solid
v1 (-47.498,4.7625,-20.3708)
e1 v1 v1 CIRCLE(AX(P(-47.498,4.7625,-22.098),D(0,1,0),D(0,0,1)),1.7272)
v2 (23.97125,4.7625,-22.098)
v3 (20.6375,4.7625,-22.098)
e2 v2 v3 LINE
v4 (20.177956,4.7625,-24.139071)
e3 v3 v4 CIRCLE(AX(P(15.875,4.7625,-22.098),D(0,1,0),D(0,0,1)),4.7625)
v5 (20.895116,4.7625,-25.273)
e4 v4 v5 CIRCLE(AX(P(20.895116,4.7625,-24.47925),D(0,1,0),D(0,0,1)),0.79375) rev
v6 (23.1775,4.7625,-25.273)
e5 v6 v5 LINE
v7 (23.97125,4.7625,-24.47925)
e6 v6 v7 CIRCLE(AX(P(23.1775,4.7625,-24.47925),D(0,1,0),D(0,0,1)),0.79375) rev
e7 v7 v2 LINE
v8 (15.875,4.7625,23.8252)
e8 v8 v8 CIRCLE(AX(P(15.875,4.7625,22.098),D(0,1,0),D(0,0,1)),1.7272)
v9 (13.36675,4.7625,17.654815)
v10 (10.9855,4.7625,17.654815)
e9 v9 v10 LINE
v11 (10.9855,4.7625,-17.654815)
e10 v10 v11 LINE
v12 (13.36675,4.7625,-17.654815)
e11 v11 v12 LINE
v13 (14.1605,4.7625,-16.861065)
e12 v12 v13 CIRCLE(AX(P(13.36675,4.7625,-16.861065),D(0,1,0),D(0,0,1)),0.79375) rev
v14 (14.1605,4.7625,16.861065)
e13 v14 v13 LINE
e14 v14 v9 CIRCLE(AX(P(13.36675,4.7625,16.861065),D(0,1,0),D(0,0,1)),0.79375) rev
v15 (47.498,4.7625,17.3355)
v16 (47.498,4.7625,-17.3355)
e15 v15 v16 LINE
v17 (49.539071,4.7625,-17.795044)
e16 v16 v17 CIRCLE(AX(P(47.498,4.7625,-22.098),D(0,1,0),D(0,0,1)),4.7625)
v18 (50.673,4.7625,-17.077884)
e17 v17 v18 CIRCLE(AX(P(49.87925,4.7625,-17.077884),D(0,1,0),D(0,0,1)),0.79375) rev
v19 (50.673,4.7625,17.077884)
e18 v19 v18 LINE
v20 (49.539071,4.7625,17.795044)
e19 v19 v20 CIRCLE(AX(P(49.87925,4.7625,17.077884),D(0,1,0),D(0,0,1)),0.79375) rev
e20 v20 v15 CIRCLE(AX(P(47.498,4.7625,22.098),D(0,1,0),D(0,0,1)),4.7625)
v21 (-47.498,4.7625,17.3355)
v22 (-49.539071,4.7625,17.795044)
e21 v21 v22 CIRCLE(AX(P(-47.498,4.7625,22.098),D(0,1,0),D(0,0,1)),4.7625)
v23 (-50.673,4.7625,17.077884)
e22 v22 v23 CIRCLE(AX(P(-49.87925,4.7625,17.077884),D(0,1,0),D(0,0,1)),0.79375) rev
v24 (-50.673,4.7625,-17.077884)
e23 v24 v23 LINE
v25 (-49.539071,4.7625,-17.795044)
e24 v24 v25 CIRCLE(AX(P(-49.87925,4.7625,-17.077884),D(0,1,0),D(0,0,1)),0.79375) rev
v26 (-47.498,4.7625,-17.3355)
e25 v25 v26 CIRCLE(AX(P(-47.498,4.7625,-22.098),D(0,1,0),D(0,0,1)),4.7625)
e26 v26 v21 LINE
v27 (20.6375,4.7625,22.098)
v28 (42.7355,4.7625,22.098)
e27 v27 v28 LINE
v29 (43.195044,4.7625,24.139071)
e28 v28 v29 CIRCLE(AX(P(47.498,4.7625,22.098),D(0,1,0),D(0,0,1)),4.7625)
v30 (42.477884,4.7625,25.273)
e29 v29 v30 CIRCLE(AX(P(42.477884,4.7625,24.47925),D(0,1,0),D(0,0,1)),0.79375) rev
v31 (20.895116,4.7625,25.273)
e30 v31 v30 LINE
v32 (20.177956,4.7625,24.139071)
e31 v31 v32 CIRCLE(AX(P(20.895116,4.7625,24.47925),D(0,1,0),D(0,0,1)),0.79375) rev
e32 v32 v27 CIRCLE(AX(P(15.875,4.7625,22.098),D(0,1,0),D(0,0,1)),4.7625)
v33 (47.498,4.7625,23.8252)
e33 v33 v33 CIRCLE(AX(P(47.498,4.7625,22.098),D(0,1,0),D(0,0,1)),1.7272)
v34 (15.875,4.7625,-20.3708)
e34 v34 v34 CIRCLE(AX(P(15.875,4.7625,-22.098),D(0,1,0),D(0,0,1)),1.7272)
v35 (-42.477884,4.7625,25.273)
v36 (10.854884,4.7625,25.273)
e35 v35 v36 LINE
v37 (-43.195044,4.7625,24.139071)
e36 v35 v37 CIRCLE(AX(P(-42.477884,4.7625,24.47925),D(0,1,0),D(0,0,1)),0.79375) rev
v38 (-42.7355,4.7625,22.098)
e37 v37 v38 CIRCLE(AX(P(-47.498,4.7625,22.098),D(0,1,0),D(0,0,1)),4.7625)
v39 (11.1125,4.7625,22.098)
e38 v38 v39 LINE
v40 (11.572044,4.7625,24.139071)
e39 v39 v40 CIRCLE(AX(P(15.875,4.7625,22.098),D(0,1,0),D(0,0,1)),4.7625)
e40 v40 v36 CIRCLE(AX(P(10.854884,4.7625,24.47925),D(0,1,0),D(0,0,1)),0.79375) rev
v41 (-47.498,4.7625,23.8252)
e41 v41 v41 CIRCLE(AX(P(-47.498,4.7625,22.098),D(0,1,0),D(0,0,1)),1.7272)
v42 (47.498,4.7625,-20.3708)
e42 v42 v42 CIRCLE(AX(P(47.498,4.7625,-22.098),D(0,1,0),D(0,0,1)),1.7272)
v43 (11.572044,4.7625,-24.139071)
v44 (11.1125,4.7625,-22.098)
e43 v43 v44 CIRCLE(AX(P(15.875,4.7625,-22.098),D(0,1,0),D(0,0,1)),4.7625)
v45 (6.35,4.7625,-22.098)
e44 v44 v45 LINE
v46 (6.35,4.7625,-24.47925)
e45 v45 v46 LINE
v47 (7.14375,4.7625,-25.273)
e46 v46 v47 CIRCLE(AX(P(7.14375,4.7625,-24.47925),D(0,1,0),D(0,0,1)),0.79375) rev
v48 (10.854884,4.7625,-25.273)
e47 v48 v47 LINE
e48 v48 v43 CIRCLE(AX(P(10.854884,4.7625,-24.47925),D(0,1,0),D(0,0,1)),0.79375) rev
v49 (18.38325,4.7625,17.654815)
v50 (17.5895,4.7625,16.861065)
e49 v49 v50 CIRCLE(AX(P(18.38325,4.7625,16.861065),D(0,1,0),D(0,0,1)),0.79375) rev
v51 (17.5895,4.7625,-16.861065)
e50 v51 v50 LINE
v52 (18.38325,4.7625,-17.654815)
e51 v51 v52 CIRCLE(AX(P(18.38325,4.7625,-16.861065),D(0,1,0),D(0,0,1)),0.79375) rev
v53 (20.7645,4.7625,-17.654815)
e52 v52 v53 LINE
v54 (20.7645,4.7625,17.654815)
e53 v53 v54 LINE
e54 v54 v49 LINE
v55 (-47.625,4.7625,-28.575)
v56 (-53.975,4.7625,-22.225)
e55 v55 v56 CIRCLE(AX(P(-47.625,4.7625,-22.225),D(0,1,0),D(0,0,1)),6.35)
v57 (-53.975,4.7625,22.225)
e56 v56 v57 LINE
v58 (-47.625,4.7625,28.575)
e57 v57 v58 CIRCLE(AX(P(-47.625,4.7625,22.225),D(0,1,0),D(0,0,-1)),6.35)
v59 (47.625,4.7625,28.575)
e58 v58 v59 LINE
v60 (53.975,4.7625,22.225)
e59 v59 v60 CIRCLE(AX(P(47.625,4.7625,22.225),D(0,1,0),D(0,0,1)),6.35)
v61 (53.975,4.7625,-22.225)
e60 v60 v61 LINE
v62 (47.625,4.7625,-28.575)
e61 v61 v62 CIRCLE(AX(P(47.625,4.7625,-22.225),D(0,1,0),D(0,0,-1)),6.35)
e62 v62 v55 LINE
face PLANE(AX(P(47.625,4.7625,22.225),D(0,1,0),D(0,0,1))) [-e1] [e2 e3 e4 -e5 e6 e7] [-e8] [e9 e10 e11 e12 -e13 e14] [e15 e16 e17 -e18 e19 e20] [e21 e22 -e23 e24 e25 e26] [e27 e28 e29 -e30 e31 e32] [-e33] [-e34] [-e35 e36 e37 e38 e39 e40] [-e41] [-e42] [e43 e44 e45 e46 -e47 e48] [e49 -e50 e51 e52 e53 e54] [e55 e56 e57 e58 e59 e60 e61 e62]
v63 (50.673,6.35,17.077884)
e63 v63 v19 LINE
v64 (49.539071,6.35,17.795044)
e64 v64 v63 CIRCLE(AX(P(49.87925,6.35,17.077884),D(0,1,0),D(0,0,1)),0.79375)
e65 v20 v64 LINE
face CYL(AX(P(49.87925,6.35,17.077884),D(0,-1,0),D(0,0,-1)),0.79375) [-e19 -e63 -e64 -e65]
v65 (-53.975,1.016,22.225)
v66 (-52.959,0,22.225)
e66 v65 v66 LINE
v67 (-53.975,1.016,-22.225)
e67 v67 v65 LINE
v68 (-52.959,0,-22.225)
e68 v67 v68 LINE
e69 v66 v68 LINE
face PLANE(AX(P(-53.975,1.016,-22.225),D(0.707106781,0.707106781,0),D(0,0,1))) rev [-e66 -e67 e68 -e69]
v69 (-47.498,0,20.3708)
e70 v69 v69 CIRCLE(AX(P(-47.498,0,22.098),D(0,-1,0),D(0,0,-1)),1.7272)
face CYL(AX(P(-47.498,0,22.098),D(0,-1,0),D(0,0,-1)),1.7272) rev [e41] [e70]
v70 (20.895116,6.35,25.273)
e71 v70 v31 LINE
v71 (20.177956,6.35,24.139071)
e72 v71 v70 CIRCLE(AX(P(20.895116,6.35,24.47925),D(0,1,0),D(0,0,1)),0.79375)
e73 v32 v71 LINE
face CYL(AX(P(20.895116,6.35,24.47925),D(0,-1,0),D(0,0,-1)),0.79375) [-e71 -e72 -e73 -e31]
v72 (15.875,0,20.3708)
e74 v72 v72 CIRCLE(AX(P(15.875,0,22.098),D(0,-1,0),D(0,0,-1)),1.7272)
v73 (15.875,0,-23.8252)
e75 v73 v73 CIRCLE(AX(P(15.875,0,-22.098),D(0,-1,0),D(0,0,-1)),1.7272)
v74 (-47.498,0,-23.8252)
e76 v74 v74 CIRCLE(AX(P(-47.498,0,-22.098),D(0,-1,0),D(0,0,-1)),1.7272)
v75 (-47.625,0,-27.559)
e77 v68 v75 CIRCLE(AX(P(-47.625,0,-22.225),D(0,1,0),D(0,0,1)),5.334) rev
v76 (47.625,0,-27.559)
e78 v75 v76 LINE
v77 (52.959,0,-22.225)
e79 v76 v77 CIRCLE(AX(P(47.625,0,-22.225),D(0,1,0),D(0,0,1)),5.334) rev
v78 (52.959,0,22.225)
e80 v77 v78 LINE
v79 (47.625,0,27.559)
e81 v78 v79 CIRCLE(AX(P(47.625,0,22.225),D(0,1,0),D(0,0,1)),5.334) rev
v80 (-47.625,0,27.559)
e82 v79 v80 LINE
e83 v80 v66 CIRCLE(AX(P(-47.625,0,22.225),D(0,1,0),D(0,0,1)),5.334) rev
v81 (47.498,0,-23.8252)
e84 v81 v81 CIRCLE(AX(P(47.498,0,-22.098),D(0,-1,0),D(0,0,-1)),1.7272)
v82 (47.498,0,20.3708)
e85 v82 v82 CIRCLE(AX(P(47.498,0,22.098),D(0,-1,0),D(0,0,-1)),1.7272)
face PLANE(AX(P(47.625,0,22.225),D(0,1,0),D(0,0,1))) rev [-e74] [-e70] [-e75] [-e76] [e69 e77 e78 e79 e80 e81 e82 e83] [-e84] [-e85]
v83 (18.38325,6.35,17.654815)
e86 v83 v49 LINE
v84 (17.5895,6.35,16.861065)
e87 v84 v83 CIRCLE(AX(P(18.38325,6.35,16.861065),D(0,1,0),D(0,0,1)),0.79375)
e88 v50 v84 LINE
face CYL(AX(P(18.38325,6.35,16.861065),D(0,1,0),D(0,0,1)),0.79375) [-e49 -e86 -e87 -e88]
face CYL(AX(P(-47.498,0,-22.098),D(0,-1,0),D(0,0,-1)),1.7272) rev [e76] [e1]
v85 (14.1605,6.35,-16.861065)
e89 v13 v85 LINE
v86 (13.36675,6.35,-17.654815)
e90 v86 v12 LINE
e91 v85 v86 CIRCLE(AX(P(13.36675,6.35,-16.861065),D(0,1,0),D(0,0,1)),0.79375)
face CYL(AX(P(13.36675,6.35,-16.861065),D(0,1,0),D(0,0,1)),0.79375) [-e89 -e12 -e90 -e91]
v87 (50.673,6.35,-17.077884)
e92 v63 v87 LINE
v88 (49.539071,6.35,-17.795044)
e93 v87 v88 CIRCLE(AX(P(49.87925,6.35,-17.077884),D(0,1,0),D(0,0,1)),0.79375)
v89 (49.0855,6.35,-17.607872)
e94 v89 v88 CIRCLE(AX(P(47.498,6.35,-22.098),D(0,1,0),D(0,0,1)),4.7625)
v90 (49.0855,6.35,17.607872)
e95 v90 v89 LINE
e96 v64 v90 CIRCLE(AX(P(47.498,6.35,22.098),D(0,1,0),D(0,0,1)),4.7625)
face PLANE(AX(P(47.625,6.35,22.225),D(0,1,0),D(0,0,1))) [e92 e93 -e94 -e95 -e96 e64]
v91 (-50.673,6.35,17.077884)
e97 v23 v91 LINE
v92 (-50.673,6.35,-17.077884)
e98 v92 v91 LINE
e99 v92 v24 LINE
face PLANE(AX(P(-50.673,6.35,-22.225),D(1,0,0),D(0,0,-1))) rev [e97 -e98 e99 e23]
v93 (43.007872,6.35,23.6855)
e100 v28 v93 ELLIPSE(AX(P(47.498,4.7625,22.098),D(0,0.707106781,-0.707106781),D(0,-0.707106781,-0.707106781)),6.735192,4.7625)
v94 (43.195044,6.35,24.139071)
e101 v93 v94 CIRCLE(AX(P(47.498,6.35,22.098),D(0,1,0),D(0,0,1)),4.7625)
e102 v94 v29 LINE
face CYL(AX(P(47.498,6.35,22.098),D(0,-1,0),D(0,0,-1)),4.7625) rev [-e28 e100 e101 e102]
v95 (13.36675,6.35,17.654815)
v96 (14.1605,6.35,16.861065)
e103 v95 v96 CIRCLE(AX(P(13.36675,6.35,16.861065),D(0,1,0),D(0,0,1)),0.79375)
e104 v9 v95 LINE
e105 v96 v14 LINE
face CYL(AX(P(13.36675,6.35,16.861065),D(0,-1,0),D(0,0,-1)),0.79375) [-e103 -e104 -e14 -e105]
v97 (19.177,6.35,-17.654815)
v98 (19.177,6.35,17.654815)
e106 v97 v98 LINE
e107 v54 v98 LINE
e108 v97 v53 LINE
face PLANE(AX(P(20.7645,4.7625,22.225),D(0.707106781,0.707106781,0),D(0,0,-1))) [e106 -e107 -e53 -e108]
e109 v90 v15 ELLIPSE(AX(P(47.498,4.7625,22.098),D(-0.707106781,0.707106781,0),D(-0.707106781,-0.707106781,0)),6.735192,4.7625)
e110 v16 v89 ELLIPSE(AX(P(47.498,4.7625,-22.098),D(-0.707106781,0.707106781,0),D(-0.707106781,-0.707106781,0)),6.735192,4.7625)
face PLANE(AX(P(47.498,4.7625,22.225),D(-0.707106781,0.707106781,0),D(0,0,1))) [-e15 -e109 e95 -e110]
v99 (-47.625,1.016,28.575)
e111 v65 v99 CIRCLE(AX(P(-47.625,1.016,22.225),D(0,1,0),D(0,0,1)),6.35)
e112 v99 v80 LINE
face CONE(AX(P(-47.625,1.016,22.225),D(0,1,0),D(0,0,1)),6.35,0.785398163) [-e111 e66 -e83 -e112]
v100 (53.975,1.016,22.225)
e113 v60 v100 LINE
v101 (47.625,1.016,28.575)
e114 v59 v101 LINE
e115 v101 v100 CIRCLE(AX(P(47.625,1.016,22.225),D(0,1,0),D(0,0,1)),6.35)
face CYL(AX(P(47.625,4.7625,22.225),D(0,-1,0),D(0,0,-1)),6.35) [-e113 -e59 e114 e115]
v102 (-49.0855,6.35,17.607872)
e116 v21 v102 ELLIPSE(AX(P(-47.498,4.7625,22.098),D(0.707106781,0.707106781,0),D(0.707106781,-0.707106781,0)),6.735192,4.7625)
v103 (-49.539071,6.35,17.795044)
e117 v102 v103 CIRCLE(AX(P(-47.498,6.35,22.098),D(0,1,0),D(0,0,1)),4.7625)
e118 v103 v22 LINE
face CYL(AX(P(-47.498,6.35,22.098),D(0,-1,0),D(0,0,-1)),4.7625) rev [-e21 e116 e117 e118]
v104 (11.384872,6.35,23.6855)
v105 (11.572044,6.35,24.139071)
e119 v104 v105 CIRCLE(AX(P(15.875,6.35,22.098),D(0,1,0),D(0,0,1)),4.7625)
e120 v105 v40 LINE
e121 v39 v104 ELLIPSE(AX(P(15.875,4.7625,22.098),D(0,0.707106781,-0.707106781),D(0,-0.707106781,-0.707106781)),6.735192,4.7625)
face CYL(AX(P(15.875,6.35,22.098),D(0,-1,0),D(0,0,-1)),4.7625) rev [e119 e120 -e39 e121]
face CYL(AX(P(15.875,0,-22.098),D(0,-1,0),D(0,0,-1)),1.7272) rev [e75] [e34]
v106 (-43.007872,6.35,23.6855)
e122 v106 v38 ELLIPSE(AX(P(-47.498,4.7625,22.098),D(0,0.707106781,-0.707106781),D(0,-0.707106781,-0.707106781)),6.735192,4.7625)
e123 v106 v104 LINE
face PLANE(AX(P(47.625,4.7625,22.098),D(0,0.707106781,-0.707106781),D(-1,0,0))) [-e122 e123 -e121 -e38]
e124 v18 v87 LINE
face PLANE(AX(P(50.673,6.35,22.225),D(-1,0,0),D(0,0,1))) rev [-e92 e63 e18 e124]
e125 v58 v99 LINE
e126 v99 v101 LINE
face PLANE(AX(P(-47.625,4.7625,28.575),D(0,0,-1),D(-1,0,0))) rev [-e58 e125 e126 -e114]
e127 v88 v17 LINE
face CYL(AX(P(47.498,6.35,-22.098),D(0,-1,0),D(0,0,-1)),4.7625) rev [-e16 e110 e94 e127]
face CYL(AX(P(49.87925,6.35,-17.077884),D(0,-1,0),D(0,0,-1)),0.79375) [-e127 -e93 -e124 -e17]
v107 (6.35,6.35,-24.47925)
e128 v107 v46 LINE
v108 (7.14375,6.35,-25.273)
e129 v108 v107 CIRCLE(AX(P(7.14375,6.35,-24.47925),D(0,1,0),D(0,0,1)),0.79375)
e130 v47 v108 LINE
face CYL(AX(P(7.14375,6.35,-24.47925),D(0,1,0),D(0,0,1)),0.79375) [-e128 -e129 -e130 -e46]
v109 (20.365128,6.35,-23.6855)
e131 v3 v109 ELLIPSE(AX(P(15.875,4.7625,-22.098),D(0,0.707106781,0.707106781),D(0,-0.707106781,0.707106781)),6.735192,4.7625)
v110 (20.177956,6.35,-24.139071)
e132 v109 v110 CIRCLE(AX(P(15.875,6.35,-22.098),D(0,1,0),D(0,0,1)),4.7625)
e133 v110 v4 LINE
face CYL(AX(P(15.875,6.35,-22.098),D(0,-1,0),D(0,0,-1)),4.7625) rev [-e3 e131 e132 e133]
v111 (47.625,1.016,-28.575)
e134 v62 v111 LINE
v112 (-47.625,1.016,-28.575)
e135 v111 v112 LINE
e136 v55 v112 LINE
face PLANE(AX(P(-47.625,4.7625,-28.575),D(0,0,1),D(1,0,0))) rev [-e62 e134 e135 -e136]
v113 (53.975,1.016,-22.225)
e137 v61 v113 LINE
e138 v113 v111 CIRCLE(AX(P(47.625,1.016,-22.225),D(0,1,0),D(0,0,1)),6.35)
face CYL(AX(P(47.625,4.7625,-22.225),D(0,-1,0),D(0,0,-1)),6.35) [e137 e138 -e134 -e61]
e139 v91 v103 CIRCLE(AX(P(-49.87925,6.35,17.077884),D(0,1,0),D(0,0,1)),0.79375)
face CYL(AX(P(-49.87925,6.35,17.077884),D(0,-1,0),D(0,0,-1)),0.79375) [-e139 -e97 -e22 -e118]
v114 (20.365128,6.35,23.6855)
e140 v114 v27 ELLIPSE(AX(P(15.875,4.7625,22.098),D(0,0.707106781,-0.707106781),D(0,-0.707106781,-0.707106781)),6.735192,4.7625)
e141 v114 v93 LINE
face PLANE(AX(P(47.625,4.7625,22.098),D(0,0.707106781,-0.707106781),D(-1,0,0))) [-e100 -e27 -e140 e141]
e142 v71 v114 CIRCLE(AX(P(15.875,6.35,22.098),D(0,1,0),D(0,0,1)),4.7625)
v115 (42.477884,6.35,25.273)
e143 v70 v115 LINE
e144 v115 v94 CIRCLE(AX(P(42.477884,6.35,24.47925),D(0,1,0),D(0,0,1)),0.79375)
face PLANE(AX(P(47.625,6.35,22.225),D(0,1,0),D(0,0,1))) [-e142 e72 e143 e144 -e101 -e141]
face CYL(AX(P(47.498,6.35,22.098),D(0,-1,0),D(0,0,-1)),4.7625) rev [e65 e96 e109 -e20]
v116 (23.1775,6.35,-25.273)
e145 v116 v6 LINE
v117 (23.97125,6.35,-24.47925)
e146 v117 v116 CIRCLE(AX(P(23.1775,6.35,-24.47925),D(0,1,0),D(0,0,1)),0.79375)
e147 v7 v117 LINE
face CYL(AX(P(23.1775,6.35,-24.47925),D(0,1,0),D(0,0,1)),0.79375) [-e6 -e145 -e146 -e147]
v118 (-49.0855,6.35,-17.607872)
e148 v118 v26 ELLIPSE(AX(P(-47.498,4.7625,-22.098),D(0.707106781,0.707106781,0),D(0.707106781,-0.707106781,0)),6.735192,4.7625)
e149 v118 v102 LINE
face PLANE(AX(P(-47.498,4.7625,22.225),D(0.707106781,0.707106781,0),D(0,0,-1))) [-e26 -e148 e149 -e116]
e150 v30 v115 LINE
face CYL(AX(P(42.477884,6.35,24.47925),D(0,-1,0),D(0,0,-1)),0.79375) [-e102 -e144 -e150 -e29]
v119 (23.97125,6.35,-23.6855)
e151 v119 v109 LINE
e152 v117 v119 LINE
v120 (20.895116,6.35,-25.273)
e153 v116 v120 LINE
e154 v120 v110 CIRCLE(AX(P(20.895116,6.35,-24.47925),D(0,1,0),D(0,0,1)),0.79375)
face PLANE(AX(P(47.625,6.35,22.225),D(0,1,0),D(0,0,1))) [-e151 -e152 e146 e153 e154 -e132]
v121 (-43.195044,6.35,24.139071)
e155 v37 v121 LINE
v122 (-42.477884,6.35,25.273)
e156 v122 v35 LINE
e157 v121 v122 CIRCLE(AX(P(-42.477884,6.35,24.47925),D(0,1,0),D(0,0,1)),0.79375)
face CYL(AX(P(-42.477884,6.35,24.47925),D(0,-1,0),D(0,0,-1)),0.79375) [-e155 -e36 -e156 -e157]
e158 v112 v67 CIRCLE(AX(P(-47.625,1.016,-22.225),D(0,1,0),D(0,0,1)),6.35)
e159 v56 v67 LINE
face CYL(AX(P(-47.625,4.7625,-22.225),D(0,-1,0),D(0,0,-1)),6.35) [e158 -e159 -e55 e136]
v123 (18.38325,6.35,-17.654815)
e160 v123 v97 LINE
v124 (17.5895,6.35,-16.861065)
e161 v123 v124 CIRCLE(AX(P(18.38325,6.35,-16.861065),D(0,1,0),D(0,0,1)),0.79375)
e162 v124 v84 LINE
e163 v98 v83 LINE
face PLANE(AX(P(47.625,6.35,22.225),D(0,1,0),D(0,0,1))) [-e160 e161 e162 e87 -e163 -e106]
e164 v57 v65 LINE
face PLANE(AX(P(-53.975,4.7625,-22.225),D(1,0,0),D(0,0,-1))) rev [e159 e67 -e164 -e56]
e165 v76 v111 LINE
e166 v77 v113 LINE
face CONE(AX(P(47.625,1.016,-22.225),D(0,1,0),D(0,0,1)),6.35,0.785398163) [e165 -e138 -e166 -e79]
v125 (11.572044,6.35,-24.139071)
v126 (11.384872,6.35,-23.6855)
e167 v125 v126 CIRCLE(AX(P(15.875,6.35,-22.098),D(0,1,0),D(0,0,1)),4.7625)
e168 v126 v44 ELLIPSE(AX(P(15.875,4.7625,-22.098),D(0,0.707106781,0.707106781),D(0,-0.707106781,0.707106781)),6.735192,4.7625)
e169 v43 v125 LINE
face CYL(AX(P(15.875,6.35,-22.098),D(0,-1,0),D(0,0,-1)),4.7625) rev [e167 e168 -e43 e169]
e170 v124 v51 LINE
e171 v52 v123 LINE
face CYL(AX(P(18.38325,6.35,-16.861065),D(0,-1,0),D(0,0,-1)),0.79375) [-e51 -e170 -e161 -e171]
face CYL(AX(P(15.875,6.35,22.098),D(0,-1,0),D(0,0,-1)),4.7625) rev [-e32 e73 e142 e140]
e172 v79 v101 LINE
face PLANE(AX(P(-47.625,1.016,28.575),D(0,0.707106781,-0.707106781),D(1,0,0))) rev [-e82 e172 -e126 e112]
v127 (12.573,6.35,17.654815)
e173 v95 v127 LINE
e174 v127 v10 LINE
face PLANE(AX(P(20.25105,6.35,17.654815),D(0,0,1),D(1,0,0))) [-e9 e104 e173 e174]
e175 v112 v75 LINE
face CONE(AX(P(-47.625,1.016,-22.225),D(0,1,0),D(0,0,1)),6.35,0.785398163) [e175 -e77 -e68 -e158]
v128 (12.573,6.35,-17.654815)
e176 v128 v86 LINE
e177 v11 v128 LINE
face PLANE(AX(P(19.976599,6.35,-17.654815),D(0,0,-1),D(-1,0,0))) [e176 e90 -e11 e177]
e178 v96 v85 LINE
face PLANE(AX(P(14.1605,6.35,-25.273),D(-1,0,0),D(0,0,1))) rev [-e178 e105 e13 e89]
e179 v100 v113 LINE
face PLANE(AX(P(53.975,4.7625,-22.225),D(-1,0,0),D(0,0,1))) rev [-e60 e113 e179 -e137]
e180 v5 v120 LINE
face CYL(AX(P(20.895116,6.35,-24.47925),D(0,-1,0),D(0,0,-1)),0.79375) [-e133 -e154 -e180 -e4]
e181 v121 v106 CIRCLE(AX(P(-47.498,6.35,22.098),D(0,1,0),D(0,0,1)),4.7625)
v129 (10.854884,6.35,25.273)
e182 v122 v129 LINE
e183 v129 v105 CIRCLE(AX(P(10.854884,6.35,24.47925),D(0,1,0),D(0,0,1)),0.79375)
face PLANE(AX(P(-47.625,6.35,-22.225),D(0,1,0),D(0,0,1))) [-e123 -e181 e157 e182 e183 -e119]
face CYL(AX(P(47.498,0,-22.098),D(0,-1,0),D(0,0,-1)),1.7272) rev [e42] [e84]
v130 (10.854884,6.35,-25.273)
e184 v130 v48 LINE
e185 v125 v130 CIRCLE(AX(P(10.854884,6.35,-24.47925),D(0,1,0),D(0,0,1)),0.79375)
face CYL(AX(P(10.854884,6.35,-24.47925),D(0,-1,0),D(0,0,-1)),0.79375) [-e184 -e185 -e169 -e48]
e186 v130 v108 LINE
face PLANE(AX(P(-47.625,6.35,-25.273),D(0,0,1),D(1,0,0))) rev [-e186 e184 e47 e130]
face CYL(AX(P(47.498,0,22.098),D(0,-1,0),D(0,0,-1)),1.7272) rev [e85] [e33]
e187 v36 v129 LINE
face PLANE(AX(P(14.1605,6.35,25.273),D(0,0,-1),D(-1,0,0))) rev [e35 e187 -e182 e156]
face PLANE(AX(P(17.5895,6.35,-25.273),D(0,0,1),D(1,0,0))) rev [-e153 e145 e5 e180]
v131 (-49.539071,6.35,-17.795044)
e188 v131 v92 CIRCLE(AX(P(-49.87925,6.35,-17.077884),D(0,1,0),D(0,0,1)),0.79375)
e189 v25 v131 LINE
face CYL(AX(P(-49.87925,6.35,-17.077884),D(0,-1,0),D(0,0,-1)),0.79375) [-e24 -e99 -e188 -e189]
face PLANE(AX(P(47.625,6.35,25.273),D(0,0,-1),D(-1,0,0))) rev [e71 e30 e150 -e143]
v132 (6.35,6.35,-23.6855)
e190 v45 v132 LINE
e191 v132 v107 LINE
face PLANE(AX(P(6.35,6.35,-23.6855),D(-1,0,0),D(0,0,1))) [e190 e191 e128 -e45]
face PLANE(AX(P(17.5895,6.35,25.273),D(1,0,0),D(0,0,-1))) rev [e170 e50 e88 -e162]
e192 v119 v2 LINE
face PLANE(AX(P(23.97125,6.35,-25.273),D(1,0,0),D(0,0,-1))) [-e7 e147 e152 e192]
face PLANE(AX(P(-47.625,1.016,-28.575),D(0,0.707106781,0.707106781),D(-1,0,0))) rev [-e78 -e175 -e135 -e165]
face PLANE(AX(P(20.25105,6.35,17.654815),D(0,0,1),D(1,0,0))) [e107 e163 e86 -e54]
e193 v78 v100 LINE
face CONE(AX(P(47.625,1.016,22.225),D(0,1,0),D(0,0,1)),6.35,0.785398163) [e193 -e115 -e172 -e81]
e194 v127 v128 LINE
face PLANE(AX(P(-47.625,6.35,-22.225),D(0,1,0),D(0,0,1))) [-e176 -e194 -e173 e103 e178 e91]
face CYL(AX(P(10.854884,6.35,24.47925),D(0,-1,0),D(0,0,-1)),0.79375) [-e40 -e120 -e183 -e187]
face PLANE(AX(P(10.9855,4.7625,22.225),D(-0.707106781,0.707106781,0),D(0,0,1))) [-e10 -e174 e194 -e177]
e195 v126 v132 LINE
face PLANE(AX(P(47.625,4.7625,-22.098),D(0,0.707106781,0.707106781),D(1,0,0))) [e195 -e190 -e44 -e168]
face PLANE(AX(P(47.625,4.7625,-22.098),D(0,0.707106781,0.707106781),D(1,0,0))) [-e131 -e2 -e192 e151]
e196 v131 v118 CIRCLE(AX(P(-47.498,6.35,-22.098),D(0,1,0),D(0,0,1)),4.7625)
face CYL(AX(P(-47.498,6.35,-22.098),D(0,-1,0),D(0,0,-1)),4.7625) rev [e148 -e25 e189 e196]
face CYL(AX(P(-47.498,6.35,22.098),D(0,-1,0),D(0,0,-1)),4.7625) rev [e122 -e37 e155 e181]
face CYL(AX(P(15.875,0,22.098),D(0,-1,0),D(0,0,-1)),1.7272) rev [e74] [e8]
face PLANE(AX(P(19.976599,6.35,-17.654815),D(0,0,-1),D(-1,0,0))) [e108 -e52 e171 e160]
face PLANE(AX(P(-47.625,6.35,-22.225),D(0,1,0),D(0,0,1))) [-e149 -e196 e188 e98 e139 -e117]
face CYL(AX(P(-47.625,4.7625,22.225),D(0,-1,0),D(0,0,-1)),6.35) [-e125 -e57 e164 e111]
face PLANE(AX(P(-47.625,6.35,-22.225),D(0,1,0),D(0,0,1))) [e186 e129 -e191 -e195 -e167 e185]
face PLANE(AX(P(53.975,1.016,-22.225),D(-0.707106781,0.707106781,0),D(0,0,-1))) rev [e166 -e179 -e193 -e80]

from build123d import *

# Parameters (mm, degrees)
BOSS_EXTRUDE1_DEPTH   = 4.7625
BOSS_EXTRUDE2_DEPTH   = 1.5875
SKETCH3_W             = 50.8
SKETCH3_H             = 1.5875
SKETCH3_W_2           = 20.32
CUT_EXTRUDE1_DEPTH    = 62.257755886
F_4_CLEARANCE_HOLE1_D = 3.4544
SKETCH6_R             = 4.7625
CUT_EXTRUDE2_DEPTH    = 62.257755886
SKETCH7_W             = 8.127020596
SKETCH7_H             = 2.415508094
SKETCH7_W_2           = 9.383301438
SKETCH7_H_2           = 3.436417543
CUT_EXTRUDE3_DEPTH    = 62.257755886
CHAMFER1_SIZE         = 1.5875
FILLET1_R             = 0.79375
CHAMFER2_SIZE         = 1.016


with BuildPart() as part:
    # Sketch1 → Boss-Extrude1 (new body)
    with BuildSketch(Plane(origin=(0, 0, 0), x_dir=(1, 0, 0), z_dir=(0, 1, 0))):
        with BuildLine():
            Line((-47.625, 28.575), (47.625, 28.575))
            ThreePointArc((47.625, 28.575), (52.115128061, 26.715128061), (53.975, 22.225))
            Line((53.975, 22.225), (53.975, -22.225))
            ThreePointArc((53.975, -22.225), (52.115128061, -26.715128061), (47.625, -28.575))
            Line((47.625, -28.575), (-47.625, -28.575))
            ThreePointArc((-47.625, -28.575), (-52.115128061, -26.715128061), (-53.975, -22.225))
            Line((-53.975, -22.225), (-53.975, 22.225))
            ThreePointArc((-53.975, 22.225), (-52.115128061, 26.715128061), (-47.625, 28.575))
        make_face()
    extrude(amount=BOSS_EXTRUDE1_DEPTH)

    # Sketch2 → Boss-Extrude2 (add)
    # profile 1 of 2: a face of its own
    with BuildSketch(Plane(origin=(0, 4.7625, 0), x_dir=(1, 0, 0), z_dir=(0, 1, 0))):
        with BuildLine():
            Line((-50.673, 22.225), (-50.673, -22.225))
            ThreePointArc((-50.673, -22.225), (-49.780261469, -24.380261469), (-47.625, -25.273))
            Line((-47.625, -25.273), (14.1605, -25.273))
            Line((14.1605, -25.273), (14.1605, 25.273))
            Line((14.1605, 25.273), (-47.625, 25.273))
            ThreePointArc((-47.625, 25.273), (-49.780261469, 24.380261469), (-50.673, 22.225))
        make_face()
        with BuildLine():
            Line((12.573, -23.6855), (-47.625, -23.6855))
            ThreePointArc((-47.625, -23.6855), (-48.657729454, -23.257729454), (-49.0855, -22.225))
            Line((-49.0855, -22.225), (-49.0855, 22.225))
            ThreePointArc((-49.0855, 22.225), (-48.657729454, 23.257729454), (-47.625, 23.6855))
            Line((-47.625, 23.6855), (12.573, 23.6855))
            Line((12.573, 23.6855), (12.573, -23.6855))
        make_face(mode=Mode.SUBTRACT)
    # profile 2 of 2: a face of its own
    with BuildSketch(Plane(origin=(0, 4.7625, 0), x_dir=(1, 0, 0), z_dir=(0, 1, 0))):
        with BuildLine():
            Line((47.625, -25.273), (17.5895, -25.273))
            Line((17.5895, -25.273), (17.5895, 25.273))
            Line((17.5895, 25.273), (47.625, 25.273))
            ThreePointArc((47.625, 25.273), (49.780261469, 24.380261469), (50.673, 22.225))
            Line((50.673, 22.225), (50.673, -22.225))
            ThreePointArc((50.673, -22.225), (49.780261469, -24.380261469), (47.625, -25.273))
        make_face()
        with BuildLine():
            Line((19.177, -23.6855), (19.177, 23.6855))
            Line((19.177, 23.6855), (47.625, 23.6855))
            ThreePointArc((47.625, 23.6855), (48.657729454, 23.257729454), (49.0855, 22.225))
            Line((49.0855, 22.225), (49.0855, -22.225))
            ThreePointArc((49.0855, -22.225), (48.657729454, -23.257729454), (47.625, -23.6855))
            Line((47.625, -23.6855), (19.177, -23.6855))
        make_face(mode=Mode.SUBTRACT)
    extrude(amount=BOSS_EXTRUDE2_DEPTH)

    # Sketch3 → Cut-Extrude1 (cut, through all)
    with BuildSketch(Plane(origin=(0, 4.7625, 0), x_dir=(1, 0, 0), z_dir=(0, 1, 0))):
        with Locations((-19.05, 24.47925)):
            Rectangle(SKETCH3_W, SKETCH3_H)
        with Locations((34.13125, 24.47925)):
            Rectangle(SKETCH3_W_2, SKETCH3_H)
    extrude(amount=CUT_EXTRUDE1_DEPTH, mode=Mode.SUBTRACT)

    # #4 Clearance Hole1 (through all)
    with Locations(Plane(origin=(0, 0, 0), x_dir=(-1, 0, 0), z_dir=(0, -1, 0))):
        with Locations((47.498, 22.098), (47.498, -22.098), (-15.875, -22.098), (-15.875, 22.098), (-47.498, 22.098), (-47.498, -22.098)):
            Hole(F_4_CLEARANCE_HOLE1_D / 2)

    # Sketch6 → Cut-Extrude2 (cut, through all)
    with BuildSketch(Plane(origin=(0, 4.7625, 0), x_dir=(1, 0, 0), z_dir=(0, 1, 0))):
        with Locations((47.498, 22.098)):
            Circle(SKETCH6_R)
        with Locations((47.498, -22.098)):
            Circle(SKETCH6_R)
        with Locations((15.875, -22.098)):
            Circle(SKETCH6_R)
        with Locations((15.875, 22.098)):
            Circle(SKETCH6_R)
        with Locations((-47.498, 22.098)):
            Circle(SKETCH6_R)
        with Locations((-47.498, -22.098)):
            Circle(SKETCH6_R)
    extrude(amount=CUT_EXTRUDE2_DEPTH, mode=Mode.SUBTRACT)

    # Sketch7 → Cut-Extrude3 (cut, through all)
    with BuildSketch(Plane(origin=(0, 4.7625, 0), x_dir=(1, 0, 0), z_dir=(0, 1, 0))):
        with Locations((15.913089186, 18.862568703)):
            Rectangle(SKETCH7_W, SKETCH7_H)
        with Locations((15.559399745, -19.373023428)):
            Rectangle(SKETCH7_W_2, SKETCH7_H_2)
    extrude(amount=CUT_EXTRUDE3_DEPTH, mode=Mode.SUBTRACT)

    # Chamfer1
    chamfer1_edges = [part.edges().sort_by_distance(p)[0] for p in [
        (-49.0855, 4.7625, 0),
        (8.86743597, 4.7625, -23.6855),
        (22.16818903, 4.7625, -23.6855),
        (49.0855, 4.7625, 0),
        (31.6865, 4.7625, 23.6855),
        (-15.8115, 4.7625, 23.6855),
        (12.573, 4.7625, 0),
        (19.177, 4.7625, 0),
    ]]
    chamfer(chamfer1_edges, length=CHAMFER1_SIZE - 0.0001)  # a hair under: the kernel refuses the full size

    # Fillet1
    fillet1_edges = [part.edges().sort_by_distance(p)[0] for p in [
        (6.35, 5.55625, -25.273),
        (23.97125, 5.55625, -25.273),
        (50.673, 5.55625, 18.548242086),
        (43.948242086, 5.55625, 25.273),
        (14.1605, 5.55625, 17.654814656),
        (17.5895, 5.55625, 17.654814656),
        (12.325242086, 5.55625, 25.273),
        (19.424757914, 5.55625, 25.273),
        (12.325242086, 5.55625, -25.273),
        (19.424757914, 5.55625, -25.273),
        (14.1605, 5.55625, -17.654814656),
        (17.5895, 5.55625, -17.654814656),
        (-50.673, 5.55625, -18.548242086),
        (-50.673, 5.55625, 18.548242086),
        (-43.948242086, 5.55625, 25.273),
        (50.673, 5.55625, -18.548242086),
    ]]
    fillet(fillet1_edges, radius=FILLET1_R)

    # Chamfer2
    chamfer2_edges = [part.edges().sort_by_distance(p)[0] for p in [
        (0, 0, -28.575),
        (52.115128061, 0, -26.715128061),
        (53.975, 0, 0),
        (52.115128061, 0, 26.715128061),
        (0, 0, 28.575),
        (-52.115128061, 0, 26.715128061),
        (-53.975, 0, 0),
        (-52.115128061, 0, -26.715128061),
    ]]
    chamfer(chamfer2_edges, length=CHAMFER2_SIZE)


solid = part.part
